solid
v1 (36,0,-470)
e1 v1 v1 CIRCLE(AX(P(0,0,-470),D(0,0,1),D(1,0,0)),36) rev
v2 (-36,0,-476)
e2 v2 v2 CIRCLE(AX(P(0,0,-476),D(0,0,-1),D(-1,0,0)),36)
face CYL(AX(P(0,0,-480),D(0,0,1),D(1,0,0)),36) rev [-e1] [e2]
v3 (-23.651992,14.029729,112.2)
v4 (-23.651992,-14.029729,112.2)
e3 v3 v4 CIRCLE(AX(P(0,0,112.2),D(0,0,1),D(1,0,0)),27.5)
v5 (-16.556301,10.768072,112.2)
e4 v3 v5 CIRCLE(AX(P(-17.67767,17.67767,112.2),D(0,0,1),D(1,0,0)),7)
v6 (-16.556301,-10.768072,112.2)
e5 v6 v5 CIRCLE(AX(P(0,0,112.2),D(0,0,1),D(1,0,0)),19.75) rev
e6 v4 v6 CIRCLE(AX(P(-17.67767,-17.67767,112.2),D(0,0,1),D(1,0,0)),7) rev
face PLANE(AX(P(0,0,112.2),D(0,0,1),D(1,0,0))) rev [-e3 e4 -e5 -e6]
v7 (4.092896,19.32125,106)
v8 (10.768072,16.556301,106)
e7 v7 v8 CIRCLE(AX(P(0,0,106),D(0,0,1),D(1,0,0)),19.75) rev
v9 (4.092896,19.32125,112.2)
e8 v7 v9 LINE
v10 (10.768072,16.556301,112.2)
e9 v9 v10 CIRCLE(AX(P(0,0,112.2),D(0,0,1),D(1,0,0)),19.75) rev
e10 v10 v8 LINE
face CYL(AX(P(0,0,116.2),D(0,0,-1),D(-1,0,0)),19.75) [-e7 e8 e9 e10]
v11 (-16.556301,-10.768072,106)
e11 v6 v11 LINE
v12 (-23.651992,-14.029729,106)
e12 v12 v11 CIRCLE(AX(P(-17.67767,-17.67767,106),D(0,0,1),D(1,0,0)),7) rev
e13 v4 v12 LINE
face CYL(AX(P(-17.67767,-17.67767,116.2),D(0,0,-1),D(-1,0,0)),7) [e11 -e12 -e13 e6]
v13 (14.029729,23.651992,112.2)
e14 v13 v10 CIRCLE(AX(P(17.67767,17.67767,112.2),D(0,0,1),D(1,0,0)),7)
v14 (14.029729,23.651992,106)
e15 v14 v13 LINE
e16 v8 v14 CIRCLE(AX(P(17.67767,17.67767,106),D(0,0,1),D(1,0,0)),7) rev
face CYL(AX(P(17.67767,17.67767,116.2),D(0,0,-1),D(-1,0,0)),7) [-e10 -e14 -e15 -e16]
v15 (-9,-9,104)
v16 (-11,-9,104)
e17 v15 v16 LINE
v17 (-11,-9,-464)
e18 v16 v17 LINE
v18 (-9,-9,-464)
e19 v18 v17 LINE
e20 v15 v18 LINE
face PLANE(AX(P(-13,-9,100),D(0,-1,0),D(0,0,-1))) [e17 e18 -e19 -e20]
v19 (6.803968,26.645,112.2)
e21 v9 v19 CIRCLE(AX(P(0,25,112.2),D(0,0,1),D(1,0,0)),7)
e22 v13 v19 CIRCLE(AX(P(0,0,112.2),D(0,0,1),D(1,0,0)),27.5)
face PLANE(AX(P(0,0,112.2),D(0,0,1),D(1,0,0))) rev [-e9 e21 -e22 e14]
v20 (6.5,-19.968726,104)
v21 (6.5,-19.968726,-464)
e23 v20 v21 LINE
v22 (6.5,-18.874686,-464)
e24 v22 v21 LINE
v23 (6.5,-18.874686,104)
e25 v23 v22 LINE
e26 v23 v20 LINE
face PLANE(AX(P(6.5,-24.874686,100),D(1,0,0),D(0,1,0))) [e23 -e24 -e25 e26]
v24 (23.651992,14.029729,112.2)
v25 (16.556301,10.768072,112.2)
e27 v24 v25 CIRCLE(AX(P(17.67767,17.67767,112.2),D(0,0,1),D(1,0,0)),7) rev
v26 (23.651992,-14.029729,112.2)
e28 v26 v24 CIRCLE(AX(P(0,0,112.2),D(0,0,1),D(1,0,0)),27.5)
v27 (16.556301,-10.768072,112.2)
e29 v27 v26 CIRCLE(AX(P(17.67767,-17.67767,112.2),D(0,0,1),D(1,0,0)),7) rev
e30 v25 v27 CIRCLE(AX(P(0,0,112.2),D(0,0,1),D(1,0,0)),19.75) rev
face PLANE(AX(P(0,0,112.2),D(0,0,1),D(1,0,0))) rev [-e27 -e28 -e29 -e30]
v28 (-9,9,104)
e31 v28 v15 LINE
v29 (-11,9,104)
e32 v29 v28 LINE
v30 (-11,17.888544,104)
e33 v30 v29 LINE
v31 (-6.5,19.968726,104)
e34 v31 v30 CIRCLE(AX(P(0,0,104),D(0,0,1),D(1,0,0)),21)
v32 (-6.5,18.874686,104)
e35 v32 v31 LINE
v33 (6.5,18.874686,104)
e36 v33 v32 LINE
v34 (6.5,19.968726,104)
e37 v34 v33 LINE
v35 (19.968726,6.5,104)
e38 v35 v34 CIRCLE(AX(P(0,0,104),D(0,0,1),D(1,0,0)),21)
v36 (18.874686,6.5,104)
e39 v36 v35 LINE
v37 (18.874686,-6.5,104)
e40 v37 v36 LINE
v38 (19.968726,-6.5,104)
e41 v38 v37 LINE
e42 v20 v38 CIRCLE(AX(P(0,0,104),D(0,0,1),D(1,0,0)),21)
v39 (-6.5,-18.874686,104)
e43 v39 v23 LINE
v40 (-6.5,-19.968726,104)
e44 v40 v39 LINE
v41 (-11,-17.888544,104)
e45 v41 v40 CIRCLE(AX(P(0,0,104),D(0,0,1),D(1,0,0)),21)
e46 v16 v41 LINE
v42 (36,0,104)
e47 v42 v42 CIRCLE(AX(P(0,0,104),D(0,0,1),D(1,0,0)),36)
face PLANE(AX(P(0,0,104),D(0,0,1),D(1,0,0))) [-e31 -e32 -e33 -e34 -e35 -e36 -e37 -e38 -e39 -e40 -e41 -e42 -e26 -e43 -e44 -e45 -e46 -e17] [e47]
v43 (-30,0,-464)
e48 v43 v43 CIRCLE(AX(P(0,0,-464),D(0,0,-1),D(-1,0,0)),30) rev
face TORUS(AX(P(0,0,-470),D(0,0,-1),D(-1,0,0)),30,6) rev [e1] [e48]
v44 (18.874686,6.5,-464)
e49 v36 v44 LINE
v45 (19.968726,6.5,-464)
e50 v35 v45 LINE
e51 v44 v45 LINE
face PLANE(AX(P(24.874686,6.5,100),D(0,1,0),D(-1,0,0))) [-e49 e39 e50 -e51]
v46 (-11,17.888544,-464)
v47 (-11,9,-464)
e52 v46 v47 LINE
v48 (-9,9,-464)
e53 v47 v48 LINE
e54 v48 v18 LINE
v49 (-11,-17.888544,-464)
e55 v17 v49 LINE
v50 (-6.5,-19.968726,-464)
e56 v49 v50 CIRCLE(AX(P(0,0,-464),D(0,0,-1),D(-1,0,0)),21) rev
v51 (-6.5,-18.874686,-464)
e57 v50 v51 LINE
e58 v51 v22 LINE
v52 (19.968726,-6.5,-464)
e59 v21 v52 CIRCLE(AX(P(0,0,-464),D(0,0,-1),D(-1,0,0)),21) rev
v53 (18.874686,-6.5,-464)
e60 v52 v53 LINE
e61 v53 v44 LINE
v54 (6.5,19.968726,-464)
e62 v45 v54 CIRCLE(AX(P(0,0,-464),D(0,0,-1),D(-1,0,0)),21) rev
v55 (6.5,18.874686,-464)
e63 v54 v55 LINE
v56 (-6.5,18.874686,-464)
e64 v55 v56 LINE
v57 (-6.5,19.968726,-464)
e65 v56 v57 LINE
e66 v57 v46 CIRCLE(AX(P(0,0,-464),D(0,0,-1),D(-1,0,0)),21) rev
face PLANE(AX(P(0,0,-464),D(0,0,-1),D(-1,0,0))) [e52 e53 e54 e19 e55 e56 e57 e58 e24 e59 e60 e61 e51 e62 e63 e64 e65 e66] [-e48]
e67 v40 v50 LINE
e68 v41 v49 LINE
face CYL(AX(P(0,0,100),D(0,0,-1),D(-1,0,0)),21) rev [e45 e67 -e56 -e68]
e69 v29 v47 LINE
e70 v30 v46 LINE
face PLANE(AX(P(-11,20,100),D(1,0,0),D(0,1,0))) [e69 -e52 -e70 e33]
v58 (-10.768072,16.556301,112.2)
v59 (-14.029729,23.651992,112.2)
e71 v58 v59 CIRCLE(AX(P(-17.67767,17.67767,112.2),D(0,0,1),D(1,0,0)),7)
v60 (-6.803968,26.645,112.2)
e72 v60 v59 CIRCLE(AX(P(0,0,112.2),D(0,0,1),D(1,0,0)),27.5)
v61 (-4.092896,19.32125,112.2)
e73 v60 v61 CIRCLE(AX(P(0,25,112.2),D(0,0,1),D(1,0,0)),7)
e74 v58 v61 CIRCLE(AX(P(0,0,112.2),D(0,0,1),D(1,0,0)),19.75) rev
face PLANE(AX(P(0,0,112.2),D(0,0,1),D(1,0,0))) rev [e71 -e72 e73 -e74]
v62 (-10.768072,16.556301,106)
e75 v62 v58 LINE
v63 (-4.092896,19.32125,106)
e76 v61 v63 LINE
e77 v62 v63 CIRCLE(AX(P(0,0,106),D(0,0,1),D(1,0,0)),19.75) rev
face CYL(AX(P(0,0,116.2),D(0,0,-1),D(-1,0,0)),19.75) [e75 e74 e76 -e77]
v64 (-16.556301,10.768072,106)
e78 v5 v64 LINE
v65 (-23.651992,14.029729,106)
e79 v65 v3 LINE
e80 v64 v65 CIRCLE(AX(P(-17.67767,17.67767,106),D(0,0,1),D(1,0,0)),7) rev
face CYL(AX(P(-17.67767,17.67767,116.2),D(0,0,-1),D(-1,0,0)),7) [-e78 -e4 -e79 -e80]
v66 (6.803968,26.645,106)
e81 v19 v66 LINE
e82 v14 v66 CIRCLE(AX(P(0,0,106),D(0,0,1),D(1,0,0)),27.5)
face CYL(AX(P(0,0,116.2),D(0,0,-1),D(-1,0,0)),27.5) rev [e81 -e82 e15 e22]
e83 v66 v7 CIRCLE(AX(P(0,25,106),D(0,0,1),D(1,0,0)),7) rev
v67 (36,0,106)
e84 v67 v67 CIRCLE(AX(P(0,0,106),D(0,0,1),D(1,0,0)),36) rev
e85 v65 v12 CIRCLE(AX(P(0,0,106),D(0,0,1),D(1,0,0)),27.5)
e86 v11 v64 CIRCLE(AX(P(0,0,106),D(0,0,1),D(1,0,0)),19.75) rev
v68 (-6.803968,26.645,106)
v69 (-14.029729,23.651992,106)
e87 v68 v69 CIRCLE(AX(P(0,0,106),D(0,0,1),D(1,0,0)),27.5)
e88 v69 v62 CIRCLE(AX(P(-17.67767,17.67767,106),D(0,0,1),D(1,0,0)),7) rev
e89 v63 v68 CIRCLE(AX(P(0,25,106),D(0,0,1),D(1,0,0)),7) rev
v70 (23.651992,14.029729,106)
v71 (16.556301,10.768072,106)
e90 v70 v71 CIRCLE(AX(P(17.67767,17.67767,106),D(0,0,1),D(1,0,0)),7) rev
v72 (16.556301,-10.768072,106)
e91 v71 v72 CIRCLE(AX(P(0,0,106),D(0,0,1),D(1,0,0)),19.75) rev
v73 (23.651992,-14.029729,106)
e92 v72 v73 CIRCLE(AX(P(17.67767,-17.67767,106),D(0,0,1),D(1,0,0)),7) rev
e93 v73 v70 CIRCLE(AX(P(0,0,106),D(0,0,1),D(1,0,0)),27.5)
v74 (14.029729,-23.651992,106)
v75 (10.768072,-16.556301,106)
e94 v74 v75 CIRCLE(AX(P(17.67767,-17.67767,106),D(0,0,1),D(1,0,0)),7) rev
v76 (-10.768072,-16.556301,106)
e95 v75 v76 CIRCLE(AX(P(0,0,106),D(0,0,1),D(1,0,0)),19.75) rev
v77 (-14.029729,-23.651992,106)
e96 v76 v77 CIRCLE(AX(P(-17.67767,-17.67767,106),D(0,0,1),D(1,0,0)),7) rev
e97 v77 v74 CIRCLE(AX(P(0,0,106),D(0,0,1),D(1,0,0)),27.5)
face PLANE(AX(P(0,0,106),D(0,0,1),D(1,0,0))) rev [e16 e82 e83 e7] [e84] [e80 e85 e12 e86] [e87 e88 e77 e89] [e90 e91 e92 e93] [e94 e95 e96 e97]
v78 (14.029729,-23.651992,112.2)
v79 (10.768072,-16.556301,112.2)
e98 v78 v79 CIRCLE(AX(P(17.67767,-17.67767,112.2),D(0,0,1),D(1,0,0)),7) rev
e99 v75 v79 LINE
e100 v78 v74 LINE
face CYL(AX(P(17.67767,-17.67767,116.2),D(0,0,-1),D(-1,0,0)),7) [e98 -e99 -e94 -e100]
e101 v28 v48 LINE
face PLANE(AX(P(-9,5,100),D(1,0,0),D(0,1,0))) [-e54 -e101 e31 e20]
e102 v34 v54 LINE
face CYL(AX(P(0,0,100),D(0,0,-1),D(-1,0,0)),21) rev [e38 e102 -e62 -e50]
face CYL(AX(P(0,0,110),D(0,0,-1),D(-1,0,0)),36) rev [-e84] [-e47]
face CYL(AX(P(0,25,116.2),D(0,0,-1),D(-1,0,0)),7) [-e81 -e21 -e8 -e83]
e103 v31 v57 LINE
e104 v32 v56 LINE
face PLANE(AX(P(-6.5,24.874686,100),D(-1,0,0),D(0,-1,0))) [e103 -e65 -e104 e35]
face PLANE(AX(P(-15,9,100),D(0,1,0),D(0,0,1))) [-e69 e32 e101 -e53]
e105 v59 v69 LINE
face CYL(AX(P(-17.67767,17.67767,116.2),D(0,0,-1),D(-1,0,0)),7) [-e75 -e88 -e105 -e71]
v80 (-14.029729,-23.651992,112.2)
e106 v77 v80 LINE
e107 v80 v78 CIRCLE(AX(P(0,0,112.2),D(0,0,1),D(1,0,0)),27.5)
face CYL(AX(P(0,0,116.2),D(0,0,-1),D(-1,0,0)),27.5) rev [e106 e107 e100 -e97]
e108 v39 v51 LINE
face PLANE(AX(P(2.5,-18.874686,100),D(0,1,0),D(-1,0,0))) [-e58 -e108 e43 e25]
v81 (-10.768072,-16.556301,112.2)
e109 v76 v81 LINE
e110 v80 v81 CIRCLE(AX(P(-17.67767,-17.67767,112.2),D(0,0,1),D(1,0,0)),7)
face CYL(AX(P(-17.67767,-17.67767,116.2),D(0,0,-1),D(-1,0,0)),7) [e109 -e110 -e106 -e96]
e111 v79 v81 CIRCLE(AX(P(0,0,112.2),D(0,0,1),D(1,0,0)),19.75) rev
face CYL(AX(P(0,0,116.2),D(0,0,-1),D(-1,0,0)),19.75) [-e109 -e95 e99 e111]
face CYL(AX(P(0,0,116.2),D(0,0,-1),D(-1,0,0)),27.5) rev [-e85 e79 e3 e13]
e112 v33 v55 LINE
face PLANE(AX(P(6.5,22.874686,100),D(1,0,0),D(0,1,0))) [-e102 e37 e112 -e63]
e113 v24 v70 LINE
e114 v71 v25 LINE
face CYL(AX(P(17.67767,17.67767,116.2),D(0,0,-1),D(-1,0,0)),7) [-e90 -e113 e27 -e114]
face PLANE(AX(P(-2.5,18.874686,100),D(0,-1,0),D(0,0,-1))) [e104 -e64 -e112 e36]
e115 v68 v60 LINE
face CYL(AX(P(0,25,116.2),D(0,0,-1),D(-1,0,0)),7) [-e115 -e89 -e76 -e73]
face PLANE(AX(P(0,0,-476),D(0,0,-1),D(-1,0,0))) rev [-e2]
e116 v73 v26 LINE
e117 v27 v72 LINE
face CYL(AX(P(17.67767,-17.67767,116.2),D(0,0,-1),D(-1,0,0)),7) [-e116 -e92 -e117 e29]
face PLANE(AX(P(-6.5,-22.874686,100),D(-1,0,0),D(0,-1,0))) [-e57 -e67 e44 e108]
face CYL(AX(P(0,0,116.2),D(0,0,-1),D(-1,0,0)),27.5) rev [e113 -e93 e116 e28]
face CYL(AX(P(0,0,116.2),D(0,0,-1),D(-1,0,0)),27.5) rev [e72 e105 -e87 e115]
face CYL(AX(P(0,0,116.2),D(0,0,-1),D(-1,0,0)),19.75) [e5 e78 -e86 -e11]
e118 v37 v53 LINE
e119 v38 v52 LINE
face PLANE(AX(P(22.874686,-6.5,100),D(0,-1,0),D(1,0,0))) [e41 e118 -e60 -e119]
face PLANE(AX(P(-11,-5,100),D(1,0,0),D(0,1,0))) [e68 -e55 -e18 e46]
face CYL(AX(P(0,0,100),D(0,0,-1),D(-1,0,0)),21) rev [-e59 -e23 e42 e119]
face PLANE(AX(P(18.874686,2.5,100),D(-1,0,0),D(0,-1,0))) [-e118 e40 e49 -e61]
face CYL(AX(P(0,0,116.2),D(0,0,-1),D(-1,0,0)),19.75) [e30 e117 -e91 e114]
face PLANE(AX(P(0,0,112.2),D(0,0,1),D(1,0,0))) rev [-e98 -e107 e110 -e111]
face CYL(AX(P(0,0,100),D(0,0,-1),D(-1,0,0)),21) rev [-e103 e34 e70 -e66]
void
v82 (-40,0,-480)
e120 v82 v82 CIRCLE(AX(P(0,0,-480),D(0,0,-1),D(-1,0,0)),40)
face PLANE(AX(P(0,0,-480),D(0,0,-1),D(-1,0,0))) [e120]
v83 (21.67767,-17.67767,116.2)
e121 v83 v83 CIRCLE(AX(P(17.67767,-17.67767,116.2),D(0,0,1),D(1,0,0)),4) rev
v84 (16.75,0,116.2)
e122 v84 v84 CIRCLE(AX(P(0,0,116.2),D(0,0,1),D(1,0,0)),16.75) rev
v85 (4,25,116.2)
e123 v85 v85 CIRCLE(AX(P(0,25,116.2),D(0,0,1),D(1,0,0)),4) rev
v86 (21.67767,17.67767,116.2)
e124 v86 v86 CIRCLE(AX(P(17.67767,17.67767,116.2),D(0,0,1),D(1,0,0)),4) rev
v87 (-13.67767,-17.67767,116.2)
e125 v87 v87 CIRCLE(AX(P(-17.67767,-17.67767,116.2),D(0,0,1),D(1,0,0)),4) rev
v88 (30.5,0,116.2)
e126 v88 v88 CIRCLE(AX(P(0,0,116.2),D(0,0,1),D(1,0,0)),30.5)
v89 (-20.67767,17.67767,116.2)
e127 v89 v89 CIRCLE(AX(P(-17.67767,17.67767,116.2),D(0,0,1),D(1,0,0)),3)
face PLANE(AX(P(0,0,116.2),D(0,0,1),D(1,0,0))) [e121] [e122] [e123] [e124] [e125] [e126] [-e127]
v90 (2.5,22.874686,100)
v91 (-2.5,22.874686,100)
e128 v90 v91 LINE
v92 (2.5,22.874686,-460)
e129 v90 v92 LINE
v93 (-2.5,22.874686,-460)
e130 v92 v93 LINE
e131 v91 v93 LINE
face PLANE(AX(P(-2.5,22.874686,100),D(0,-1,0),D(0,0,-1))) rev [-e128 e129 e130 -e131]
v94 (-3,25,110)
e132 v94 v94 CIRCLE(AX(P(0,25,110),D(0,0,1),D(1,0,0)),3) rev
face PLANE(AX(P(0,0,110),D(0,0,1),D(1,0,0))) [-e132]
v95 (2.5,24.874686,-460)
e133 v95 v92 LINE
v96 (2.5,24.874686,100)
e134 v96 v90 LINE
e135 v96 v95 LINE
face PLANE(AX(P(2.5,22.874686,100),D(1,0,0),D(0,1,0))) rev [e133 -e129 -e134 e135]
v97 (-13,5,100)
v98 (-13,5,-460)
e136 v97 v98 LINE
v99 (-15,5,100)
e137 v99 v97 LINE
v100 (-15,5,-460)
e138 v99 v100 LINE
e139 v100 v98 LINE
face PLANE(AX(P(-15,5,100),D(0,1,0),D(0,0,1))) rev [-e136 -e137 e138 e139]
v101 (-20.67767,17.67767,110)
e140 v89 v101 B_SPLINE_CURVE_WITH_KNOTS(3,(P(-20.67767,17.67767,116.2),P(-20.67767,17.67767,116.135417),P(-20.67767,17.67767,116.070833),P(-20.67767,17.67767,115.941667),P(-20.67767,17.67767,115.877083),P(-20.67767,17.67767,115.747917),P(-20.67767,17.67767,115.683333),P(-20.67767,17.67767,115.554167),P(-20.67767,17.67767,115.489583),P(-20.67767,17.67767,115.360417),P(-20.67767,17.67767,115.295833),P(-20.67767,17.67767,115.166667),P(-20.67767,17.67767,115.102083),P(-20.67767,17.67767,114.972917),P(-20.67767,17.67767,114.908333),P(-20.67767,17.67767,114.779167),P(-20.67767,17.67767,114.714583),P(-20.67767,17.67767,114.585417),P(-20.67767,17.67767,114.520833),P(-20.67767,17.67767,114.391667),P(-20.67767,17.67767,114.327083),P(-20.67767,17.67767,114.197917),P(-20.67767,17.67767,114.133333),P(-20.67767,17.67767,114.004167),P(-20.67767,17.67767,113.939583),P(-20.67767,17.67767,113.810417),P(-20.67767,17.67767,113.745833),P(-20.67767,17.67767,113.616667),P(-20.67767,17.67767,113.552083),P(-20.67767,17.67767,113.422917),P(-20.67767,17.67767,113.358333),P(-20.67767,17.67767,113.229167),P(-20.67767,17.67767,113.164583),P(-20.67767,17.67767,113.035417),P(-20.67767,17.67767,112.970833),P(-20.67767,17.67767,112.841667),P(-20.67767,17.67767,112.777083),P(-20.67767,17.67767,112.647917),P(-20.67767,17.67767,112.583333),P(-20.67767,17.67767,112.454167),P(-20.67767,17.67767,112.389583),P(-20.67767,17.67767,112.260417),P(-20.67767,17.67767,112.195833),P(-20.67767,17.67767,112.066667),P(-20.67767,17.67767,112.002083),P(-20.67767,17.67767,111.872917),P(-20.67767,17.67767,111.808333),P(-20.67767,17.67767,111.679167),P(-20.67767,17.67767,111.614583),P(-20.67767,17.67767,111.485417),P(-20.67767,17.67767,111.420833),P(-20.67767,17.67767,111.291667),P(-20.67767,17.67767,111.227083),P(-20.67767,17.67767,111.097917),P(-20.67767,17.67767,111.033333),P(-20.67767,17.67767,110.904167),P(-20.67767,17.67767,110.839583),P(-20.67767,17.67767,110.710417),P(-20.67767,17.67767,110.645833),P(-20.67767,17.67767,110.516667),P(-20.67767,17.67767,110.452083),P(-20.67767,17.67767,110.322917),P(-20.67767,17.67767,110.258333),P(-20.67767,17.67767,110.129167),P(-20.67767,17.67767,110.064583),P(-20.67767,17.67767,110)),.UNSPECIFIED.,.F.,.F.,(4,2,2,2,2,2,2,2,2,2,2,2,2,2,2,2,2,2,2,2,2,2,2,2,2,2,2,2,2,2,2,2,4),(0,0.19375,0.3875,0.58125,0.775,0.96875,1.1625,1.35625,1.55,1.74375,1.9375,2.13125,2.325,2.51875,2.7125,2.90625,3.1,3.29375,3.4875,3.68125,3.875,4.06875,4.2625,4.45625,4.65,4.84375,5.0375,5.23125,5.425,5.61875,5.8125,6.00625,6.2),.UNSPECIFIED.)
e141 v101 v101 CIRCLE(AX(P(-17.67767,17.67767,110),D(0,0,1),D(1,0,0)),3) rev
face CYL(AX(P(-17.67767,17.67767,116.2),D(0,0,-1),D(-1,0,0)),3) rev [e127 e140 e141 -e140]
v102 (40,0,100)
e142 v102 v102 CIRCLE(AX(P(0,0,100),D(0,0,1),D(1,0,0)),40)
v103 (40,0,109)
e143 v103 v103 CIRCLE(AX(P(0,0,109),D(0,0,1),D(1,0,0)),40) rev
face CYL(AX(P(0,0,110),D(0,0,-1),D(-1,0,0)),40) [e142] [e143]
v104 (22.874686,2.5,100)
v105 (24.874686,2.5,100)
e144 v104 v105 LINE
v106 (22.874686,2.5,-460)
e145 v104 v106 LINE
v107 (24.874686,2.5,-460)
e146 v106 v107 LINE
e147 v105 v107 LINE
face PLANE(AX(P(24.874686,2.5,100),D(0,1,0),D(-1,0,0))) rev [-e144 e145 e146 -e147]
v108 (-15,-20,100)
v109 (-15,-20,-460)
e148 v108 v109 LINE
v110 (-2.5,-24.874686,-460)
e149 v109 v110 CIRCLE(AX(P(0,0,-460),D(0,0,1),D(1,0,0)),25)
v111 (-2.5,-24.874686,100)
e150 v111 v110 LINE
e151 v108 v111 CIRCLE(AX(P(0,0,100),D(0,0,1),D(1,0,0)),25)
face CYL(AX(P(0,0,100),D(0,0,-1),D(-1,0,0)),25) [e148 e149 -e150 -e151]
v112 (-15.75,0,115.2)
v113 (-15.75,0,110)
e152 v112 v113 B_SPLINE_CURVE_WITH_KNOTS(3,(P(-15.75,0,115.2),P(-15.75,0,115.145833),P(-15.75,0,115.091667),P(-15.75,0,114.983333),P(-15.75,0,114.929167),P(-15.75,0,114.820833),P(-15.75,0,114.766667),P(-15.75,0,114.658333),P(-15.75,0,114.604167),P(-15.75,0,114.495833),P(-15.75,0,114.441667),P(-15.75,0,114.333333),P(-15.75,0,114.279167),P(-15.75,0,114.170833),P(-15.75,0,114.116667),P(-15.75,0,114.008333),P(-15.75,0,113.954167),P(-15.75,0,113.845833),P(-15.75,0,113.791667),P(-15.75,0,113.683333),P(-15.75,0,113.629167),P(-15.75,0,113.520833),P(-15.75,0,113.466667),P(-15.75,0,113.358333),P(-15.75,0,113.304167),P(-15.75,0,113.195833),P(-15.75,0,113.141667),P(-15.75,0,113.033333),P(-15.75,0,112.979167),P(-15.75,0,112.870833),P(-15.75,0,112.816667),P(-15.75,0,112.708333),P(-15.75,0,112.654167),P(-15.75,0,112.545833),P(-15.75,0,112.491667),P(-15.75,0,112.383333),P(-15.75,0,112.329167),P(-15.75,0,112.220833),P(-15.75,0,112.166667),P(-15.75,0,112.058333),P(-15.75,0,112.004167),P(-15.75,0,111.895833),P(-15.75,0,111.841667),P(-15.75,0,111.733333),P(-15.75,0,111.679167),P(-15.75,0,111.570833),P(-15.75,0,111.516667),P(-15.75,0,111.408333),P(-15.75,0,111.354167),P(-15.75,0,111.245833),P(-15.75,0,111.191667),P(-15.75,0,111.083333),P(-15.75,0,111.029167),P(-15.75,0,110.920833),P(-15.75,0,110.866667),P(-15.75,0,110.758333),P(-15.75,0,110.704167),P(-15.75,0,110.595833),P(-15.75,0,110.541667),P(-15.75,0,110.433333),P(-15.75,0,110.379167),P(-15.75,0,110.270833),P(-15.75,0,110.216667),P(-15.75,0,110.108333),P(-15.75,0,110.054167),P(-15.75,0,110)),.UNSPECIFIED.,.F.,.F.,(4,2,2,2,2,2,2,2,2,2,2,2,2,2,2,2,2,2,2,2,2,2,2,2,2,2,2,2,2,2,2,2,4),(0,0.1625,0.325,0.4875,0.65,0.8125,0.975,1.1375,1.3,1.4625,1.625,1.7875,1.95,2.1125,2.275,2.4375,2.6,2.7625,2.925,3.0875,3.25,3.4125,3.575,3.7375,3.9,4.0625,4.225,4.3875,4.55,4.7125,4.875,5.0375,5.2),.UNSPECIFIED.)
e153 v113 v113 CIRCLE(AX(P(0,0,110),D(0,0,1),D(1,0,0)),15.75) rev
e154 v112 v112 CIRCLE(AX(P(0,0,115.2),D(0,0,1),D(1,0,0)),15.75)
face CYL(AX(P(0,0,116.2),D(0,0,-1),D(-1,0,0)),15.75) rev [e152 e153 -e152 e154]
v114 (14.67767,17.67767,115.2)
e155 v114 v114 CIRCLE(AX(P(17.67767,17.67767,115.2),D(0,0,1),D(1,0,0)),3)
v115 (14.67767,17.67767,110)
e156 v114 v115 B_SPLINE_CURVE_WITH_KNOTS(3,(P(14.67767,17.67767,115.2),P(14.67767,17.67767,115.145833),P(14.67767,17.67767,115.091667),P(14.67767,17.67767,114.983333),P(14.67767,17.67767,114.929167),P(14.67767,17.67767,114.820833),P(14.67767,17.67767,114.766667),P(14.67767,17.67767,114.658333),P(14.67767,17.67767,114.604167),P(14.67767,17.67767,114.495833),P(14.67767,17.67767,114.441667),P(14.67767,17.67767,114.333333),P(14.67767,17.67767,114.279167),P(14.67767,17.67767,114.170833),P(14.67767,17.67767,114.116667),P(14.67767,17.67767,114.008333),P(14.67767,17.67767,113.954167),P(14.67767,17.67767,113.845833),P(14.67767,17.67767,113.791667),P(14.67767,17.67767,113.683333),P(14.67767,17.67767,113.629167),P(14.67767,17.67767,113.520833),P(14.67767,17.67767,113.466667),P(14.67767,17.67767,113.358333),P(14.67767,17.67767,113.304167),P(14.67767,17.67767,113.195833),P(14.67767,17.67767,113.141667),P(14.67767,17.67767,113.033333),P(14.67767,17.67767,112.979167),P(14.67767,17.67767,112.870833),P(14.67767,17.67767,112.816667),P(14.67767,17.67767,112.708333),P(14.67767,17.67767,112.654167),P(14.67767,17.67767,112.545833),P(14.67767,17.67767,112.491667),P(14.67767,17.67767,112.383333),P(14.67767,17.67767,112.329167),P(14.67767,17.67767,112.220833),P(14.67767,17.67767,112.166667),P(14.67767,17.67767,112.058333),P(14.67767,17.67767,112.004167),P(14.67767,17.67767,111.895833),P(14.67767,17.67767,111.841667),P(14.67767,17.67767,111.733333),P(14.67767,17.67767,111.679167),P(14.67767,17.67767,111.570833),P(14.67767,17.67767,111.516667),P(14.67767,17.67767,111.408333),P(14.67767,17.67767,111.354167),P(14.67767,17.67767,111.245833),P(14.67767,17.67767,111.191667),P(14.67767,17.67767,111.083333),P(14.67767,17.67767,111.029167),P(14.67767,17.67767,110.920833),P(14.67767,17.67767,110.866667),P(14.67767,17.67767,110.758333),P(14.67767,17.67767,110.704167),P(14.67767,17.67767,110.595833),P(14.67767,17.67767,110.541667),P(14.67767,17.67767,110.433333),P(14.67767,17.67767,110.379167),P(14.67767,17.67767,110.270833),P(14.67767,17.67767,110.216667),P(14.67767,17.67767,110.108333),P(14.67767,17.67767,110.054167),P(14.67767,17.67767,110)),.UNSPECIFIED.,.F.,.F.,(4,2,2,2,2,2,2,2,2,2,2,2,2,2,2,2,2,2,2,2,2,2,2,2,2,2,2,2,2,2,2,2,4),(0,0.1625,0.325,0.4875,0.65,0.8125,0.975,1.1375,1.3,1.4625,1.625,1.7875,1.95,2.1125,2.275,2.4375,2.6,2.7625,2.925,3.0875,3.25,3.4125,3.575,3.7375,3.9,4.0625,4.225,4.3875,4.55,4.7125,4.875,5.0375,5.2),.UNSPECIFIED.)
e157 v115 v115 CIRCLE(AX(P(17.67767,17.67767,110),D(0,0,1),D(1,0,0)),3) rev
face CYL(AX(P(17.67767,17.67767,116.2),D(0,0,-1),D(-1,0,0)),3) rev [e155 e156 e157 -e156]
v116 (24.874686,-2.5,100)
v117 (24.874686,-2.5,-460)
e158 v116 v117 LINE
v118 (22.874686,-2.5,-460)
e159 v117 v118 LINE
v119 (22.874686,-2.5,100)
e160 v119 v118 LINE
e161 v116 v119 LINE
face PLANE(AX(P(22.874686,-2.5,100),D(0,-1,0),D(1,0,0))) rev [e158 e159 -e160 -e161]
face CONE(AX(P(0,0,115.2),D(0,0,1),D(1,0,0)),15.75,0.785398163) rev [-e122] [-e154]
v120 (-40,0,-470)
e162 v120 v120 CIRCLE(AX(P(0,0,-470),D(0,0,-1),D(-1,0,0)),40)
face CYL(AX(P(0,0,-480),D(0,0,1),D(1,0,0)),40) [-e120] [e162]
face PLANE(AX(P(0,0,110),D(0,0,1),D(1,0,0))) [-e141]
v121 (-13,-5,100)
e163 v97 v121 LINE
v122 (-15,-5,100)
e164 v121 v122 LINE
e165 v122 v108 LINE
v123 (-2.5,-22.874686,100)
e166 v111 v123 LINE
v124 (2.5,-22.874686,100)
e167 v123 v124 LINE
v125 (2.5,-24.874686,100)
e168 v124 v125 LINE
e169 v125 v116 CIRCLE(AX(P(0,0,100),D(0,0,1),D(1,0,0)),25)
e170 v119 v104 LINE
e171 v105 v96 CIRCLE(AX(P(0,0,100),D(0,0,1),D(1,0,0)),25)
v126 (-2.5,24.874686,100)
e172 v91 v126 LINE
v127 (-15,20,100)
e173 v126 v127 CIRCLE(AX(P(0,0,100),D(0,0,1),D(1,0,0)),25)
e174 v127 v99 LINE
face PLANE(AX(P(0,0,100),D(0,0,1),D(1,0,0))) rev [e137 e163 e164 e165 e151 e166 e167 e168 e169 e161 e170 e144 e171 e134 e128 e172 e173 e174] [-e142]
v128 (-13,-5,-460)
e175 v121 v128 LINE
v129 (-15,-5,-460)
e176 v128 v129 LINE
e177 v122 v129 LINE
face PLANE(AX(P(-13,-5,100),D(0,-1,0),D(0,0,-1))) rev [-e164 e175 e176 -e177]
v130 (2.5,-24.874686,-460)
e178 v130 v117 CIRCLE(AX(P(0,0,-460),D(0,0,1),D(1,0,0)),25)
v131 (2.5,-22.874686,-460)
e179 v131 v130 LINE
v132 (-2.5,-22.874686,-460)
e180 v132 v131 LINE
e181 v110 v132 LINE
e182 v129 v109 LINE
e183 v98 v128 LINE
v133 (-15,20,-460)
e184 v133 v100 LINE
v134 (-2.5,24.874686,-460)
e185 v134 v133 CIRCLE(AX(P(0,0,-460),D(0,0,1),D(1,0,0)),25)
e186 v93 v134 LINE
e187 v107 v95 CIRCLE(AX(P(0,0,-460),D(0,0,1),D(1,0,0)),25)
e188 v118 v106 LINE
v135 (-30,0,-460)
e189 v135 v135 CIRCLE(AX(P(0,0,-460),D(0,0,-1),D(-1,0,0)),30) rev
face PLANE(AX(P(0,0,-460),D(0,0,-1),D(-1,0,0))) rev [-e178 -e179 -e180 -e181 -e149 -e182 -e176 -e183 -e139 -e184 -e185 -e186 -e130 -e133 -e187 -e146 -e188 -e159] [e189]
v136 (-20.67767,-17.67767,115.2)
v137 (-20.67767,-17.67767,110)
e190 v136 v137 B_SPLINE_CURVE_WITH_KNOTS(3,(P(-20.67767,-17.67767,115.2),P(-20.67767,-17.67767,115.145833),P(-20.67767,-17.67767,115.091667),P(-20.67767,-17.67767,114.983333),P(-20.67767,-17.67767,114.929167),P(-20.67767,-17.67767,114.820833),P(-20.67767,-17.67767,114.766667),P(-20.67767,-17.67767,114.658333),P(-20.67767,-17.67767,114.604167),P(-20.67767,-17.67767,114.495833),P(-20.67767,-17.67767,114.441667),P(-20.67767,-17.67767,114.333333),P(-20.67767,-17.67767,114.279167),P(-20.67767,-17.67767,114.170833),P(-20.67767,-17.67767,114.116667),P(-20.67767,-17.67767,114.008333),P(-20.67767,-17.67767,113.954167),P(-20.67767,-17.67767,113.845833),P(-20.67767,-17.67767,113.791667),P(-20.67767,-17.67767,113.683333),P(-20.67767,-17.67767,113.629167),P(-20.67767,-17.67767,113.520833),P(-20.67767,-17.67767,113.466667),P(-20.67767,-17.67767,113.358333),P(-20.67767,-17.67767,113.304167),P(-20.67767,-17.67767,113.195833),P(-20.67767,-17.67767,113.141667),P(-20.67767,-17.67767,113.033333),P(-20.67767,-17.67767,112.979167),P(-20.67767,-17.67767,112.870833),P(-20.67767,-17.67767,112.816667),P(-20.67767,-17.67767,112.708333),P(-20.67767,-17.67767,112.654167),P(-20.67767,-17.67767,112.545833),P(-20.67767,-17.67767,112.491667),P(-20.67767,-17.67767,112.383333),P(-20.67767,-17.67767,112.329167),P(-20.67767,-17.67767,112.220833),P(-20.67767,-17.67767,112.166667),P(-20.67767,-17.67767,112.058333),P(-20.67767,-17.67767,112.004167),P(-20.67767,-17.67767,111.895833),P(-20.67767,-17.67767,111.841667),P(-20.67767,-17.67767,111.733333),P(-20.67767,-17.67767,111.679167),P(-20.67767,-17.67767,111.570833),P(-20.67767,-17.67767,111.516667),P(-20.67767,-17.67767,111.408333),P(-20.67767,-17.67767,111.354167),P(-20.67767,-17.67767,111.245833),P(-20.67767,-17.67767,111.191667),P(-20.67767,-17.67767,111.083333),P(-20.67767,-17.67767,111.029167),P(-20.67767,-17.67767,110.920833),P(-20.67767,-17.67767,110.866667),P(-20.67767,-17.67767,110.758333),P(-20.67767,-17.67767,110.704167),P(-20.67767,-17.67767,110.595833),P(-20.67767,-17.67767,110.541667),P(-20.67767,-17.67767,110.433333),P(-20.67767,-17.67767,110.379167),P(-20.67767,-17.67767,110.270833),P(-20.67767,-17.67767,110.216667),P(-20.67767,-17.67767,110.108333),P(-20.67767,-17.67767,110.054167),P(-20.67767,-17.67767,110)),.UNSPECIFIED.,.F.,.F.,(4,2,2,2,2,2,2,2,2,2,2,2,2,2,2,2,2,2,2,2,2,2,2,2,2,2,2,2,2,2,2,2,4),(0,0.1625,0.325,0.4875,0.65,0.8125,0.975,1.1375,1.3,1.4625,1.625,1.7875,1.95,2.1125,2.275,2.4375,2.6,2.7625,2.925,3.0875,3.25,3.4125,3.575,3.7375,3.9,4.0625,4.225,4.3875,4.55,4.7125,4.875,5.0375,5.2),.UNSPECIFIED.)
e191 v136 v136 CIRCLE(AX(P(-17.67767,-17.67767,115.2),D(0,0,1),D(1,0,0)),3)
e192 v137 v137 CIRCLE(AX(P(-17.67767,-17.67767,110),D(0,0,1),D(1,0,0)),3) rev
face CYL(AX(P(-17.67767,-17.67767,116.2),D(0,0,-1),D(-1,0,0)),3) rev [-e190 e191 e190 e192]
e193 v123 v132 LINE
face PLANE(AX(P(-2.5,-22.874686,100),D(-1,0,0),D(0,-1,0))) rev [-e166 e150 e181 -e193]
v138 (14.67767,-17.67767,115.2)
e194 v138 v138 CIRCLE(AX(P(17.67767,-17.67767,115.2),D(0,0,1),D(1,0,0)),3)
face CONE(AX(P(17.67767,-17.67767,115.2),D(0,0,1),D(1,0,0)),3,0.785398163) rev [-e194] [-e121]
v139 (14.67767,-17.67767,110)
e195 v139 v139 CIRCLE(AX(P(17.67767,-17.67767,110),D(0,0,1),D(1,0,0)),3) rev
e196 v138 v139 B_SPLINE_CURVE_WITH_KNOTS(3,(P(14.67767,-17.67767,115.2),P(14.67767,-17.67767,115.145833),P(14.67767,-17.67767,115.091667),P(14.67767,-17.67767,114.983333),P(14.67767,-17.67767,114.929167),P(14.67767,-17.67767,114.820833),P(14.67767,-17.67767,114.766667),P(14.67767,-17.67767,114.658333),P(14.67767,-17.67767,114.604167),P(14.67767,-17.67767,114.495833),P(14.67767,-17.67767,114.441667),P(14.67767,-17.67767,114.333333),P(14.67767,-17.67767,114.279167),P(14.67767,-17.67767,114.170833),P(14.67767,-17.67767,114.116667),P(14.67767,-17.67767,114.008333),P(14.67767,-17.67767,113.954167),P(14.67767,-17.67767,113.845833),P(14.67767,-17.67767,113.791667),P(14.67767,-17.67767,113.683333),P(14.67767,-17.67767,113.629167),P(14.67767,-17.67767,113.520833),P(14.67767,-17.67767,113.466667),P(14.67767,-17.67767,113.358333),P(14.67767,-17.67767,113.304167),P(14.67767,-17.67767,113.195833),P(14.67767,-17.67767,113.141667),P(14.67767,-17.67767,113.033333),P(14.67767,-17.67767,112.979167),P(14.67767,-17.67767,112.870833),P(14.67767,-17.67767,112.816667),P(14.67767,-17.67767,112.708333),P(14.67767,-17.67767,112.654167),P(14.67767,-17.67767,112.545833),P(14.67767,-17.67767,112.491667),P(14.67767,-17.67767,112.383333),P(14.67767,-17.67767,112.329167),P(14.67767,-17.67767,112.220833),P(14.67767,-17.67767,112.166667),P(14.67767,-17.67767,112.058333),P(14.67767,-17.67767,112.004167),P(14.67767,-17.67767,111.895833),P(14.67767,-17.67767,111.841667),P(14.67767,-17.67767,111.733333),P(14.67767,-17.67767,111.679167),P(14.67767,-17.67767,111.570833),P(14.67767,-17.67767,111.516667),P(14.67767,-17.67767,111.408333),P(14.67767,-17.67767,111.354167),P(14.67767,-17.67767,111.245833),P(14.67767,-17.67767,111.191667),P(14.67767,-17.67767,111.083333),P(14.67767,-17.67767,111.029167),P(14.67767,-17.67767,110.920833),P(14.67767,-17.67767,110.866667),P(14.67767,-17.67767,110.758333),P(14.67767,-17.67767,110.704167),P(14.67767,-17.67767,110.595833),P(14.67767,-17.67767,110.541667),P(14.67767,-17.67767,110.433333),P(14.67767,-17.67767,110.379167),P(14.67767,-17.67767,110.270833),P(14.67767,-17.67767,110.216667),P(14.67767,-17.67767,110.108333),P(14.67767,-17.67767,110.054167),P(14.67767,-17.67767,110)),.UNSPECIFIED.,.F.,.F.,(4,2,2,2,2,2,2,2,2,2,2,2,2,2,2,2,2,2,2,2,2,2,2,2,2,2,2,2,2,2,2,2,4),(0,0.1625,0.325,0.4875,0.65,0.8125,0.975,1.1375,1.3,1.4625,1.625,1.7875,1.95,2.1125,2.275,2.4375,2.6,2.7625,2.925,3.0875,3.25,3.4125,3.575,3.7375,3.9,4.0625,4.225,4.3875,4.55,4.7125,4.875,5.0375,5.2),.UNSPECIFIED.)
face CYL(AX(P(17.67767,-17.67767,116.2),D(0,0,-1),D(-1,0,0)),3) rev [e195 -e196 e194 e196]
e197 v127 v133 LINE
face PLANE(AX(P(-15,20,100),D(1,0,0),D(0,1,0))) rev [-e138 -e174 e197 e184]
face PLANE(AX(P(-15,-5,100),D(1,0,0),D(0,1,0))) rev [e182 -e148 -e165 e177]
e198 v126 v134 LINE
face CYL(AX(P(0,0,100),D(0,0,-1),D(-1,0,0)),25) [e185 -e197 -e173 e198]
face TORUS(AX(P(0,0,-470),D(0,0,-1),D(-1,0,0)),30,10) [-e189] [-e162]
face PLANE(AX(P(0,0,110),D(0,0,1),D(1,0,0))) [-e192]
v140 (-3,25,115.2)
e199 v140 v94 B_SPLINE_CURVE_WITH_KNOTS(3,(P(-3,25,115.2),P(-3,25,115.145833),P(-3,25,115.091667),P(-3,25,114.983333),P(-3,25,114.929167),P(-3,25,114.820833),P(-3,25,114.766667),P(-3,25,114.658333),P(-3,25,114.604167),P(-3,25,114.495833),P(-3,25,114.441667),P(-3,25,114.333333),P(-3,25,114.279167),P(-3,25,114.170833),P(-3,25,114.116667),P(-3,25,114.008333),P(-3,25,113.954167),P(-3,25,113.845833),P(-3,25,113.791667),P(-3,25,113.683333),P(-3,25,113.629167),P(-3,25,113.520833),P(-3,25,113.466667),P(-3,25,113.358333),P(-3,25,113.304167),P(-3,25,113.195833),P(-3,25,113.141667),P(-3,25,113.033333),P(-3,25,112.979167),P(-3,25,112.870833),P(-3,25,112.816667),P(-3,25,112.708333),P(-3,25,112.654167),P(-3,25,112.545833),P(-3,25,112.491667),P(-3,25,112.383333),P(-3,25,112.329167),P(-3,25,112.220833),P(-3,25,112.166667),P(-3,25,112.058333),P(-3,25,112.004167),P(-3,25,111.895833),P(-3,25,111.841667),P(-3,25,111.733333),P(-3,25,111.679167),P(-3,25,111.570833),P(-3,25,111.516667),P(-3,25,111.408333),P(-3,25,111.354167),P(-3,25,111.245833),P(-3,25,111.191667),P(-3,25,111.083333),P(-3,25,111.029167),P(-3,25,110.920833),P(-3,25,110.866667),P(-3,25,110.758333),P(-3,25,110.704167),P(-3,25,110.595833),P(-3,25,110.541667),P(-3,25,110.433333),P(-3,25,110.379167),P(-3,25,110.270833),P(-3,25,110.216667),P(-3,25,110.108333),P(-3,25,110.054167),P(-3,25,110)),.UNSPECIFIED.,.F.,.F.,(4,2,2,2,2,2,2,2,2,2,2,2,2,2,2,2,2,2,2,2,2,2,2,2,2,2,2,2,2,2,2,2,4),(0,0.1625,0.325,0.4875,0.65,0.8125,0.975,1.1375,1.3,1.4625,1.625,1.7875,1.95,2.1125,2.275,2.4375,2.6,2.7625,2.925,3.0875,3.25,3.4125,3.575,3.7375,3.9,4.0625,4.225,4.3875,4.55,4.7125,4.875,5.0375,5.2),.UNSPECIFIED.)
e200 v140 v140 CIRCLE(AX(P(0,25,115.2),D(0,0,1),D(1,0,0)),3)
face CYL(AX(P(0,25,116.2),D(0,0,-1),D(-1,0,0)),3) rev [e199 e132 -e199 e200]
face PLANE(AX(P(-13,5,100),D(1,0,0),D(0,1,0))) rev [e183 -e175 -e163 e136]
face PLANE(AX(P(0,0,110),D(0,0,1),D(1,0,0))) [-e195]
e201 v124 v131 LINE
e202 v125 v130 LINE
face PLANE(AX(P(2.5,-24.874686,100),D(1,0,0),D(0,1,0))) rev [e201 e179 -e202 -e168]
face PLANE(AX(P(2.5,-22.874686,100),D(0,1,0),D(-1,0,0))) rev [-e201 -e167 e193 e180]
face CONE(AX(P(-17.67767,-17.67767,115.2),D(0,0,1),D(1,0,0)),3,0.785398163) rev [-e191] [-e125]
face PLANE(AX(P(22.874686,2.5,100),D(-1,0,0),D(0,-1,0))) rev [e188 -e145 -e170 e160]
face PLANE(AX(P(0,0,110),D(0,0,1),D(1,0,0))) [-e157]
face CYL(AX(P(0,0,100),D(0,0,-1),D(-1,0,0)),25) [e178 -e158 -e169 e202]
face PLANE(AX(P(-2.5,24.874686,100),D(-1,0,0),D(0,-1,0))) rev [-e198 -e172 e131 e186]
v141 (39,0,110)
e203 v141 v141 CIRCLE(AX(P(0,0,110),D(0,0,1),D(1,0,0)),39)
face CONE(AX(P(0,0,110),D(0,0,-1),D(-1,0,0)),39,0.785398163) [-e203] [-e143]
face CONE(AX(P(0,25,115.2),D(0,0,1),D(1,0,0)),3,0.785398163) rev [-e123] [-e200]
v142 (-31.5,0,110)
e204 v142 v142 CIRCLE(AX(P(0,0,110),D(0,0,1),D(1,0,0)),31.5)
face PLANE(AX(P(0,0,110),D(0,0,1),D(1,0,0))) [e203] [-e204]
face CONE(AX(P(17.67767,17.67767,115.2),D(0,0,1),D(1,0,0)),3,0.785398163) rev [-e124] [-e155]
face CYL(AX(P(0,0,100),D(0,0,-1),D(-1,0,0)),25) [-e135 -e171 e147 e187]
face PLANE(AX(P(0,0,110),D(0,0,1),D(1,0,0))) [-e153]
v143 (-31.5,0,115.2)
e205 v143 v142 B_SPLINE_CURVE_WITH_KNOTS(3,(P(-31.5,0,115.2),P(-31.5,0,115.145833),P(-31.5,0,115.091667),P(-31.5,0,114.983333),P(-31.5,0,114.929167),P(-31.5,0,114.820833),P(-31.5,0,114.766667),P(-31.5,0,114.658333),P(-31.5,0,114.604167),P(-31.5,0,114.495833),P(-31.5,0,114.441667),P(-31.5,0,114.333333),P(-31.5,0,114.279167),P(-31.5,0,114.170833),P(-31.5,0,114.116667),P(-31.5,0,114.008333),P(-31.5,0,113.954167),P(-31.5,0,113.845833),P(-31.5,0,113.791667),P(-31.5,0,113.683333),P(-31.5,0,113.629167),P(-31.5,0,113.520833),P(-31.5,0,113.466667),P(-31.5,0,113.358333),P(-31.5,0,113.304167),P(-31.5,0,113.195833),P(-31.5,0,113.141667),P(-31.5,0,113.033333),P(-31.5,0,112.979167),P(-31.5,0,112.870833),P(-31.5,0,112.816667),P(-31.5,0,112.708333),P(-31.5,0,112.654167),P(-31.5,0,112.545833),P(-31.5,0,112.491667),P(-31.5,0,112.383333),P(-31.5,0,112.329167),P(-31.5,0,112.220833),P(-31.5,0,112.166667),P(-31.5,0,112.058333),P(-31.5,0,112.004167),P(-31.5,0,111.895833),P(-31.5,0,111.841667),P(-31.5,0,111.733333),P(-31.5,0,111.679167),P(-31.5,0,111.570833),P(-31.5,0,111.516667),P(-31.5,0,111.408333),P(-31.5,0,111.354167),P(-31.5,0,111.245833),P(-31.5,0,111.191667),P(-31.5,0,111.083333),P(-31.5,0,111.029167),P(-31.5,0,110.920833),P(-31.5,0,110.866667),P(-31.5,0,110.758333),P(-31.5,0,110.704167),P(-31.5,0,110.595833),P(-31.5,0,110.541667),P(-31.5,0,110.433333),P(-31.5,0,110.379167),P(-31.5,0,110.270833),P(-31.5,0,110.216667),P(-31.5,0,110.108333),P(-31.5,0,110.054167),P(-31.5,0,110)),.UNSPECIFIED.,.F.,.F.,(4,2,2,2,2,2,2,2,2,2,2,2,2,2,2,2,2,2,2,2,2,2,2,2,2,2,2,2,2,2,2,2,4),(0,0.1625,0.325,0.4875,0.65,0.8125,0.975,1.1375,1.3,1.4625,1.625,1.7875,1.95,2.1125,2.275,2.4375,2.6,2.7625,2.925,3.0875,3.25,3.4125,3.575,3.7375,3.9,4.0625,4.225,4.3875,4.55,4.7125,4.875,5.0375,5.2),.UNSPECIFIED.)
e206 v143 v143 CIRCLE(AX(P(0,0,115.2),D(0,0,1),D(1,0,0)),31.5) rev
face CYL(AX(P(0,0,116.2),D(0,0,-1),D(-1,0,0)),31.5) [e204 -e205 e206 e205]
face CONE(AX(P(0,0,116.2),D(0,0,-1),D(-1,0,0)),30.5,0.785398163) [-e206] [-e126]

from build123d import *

# Parameters (mm, degrees)
AUFSATZ_LINEAR_AUSTRAGEN1_DEPTH = 100
AUFSATZ_LINEAR_START            = -460
AUFSATZ_LINEAR_AUSTRAGEN2_DEPTH = 460
SKIZZE2_R                       = 40
AUFSATZ_LINEAR_AUSTRAGEN3_DEPTH = 10
AUFSATZ_LINEAR_START_2          = 20
SKIZZE3_R                       = 40
AUFSATZ_LINEAR_AUSTRAGEN4_DEPTH = 20
SKIZZE4_R                       = 31.5
SKIZZE4_R_2                     = 15.75
SKIZZE4_R_3                     = 3
AUFSATZ_LINEAR_AUSTRAGEN5_DEPTH = 6.2
FASE1_SIZE                      = 1
VERRUNDUNG1_R                   = 10
WANDUNG8_START                  = -476
WANDUNG8_DEPTH                  = 582
WANDUNG8_2_OUTLINE_R            = 36
WANDUNG8_2_DEPTH                = 5.9999999
WANDUNG8_START_2                = 104
WANDUNG8_3_OUTLINE_R            = 36
WANDUNG8_3_DEPTH                = 2
WANDUNG8_START_3                = 106
WANDUNG8_4_DEPTH                = 6.2
WANDUNG8_5_DEPTH                = 12


with BuildPart() as part:
    # Skizze1 → Aufsatz-Linear austragen1 (new body)
    with BuildSketch(Plane.XY):
        with BuildLine():
            Line((-15, 20), (-15, 5))
            Line((-15, 5), (-13, 5))
            Line((-13, 5), (-13, -5))
            Line((-13, -5), (-15, -5))
            Line((-15, -5), (-15, -20))
            ThreePointArc((-15, -20), (-9.083123952, -23.291561976), (-2.5, -24.874685928))
            Line((-2.5, -24.874685928), (-2.5, -22.874685928))
            Line((-2.5, -22.874685928), (2.5, -22.874685928))
            Line((2.5, -22.874685928), (2.5, -24.874685928))
            ThreePointArc((2.5, -24.874685928), (17.67766953, -17.67766953), (24.874685928, -2.5))
            Line((24.874685928, -2.5), (22.874685928, -2.5))
            Line((22.874685928, -2.5), (22.874685928, 2.5))
            Line((22.874685928, 2.5), (24.874685928, 2.5))
            ThreePointArc((24.874685928, 2.5), (17.67766953, 17.67766953), (2.5, 24.874685928))
            Line((2.5, 24.874685928), (2.5, 22.874685928))
            Line((2.5, 22.874685928), (-2.5, 22.874685928))
            Line((-2.5, 22.874685928), (-2.5, 24.874685928))
            ThreePointArc((-2.5, 24.874685928), (-9.083123952, 23.291561976), (-15, 20))
        make_face()
    extrude(amount=AUFSATZ_LINEAR_AUSTRAGEN1_DEPTH)

    # Skizze1<2> → Aufsatz-Linear austragen2 (add)
    with BuildSketch(Plane.XY.offset(AUFSATZ_LINEAR_START)):
        with BuildLine():
            Line((-15, 20), (-15, 5))
            Line((-15, 5), (-13, 5))
            Line((-13, 5), (-13, -5))
            Line((-13, -5), (-15, -5))
            Line((-15, -5), (-15, -20))
            ThreePointArc((-15, -20), (-9.083123952, -23.291561976), (-2.5, -24.874685928))
            Line((-2.5, -24.874685928), (-2.5, -22.874685928))
            Line((-2.5, -22.874685928), (2.5, -22.874685928))
            Line((2.5, -22.874685928), (2.5, -24.874685928))
            ThreePointArc((2.5, -24.874685928), (17.67766953, -17.67766953), (24.874685928, -2.5))
            Line((24.874685928, -2.5), (22.874685928, -2.5))
            Line((22.874685928, -2.5), (22.874685928, 2.5))
            Line((22.874685928, 2.5), (24.874685928, 2.5))
            ThreePointArc((24.874685928, 2.5), (17.67766953, 17.67766953), (2.5, 24.874685928))
            Line((2.5, 24.874685928), (2.5, 22.874685928))
            Line((2.5, 22.874685928), (-2.5, 22.874685928))
            Line((-2.5, 22.874685928), (-2.5, 24.874685928))
            ThreePointArc((-2.5, 24.874685928), (-9.083123952, 23.291561976), (-15, 20))
        make_face()
    extrude(amount=AUFSATZ_LINEAR_AUSTRAGEN2_DEPTH)

    # Skizze2 → Aufsatz-Linear austragen3 (add)
    with BuildSketch(Plane.XY.offset(100)):
        Circle(SKIZZE2_R)
    extrude(amount=AUFSATZ_LINEAR_AUSTRAGEN3_DEPTH)

    # Skizze3 → Aufsatz-Linear austragen4 (add)
    with BuildSketch(Plane(origin=(0, 0, -460), x_dir=(-1, 0, 0), z_dir=(0, 0, -1)).offset(AUFSATZ_LINEAR_START_2)):
        with Locations(Location((0, 0, 0), (0, 0, 180))):
            Circle(SKIZZE3_R)
    extrude(amount=-AUFSATZ_LINEAR_AUSTRAGEN4_DEPTH)

    # Skizze4 → Aufsatz-Linear austragen5 (add)
    with BuildSketch(Plane.XY.offset(110)):
        with Locations(Location((0, 0, 0), (0, 0, 180))):
            Circle(SKIZZE4_R)
        with Locations(Location((0, 0, 0), (0, 0, 180))):
            Circle(SKIZZE4_R_2, mode=Mode.SUBTRACT)
        with Locations(Location((0, 25, 0), (0, 0, 180))):
            Circle(SKIZZE4_R_3, mode=Mode.SUBTRACT)
        with Locations(Location((17.67766953, 17.67766953, 0), (0, 0, 180))):
            Circle(SKIZZE4_R_3, mode=Mode.SUBTRACT)
        with Locations(Location((17.67766953, -17.67766953, 0), (0, 0, 180))):
            Circle(SKIZZE4_R_3, mode=Mode.SUBTRACT)
        with Locations(Location((-17.67766953, -17.67766953, 0), (0, 0, 180))):
            Circle(SKIZZE4_R_3, mode=Mode.SUBTRACT)
        with Locations(Location((-17.67766953, 17.67766953, 0), (0, 0, 180))):
            Circle(SKIZZE4_R_3, mode=Mode.SUBTRACT)
    extrude(amount=AUFSATZ_LINEAR_AUSTRAGEN5_DEPTH)

    # Fase1
    fase1_edges = [part.edges().sort_by_distance(p)[0] for p in [
        (-40, 0, 110),
        (31.5, 0, 116.2),
        (15.75, 0, 116.2),
        (3, 25, 116.2),
        (20.67766953, 17.67766953, 116.2),
        (20.67766953, -17.67766953, 116.2),
        (-14.67766953, -17.67766953, 116.2),
    ]]
    chamfer(fase1_edges, length=FASE1_SIZE)

    # Verrundung1
    verrundung1_edges = [part.edges().sort_by_distance(p)[0] for p in [
        (-40, 0, -460),
    ]]
    fillet(verrundung1_edges, radius=VERRUNDUNG1_R)

    # Wandung8: read off the stored shape, not the designer's step
    # Wandung8 outline → Wandung8 (cut)
    with BuildSketch(Plane.XY.offset(WANDUNG8_START)):
        with BuildLine():
            ThreePointArc((-6.5, 19.968725548), (-8.811599685, 19.06189159), (-11, 17.88854382))
            Line((-11, 17.88854382), (-11, 9))
            Line((-11, 9), (-9, 9))
            Line((-9, 9), (-9, -9))
            Line((-9, -9), (-11, -9))
            Line((-11, -9), (-11, -17.88854382))
            ThreePointArc((-11, -17.88854382), (-8.811599685, -19.06189159), (-6.5, -19.968725548))
            Line((-6.5, -19.968725548), (-6.5, -18.874685928))
            Line((-6.5, -18.874685928), (6.5, -18.874685928))
            Line((6.5, -18.874685928), (6.5, -19.968725548))
            ThreePointArc((6.5, -19.968725548), (14.849242405, -14.849242405), (19.968725548, -6.5))
            Line((19.968725548, -6.5), (18.874685928, -6.5))
            Line((18.874685928, -6.5), (18.874685928, 6.5))
            Line((18.874685928, 6.5), (19.968725548, 6.5))
            ThreePointArc((19.968725548, 6.5), (14.849242405, 14.849242405), (6.5, 19.968725548))
            Line((6.5, 19.968725548), (6.5, 18.874685928))
            Line((6.5, 18.874685928), (-6.5, 18.874685928))
            Line((-6.5, 18.874685928), (-6.5, 19.968725548))
        make_face()
    extrude(amount=WANDUNG8_DEPTH, mode=Mode.SUBTRACT)

    # Wandung8 2 outline → Wandung8 2 (cut)
    with BuildSketch(Plane.XY.offset(WANDUNG8_START)):
        Circle(WANDUNG8_2_OUTLINE_R)
        with BuildLine():
            ThreePointArc((-11, 17.88854382), (-8.811599685, 19.06189159), (-6.5, 19.968725548))
            Line((-6.5, 19.968725548), (-6.5, 18.874685928))
            Line((-6.5, 18.874685928), (6.5, 18.874685928))
            Line((6.5, 18.874685928), (6.5, 19.968725548))
            ThreePointArc((6.5, 19.968725548), (14.849242405, 14.849242405), (19.968725548, 6.5))
            Line((19.968725548, 6.5), (18.874685928, 6.5))
            Line((18.874685928, 6.5), (18.874685928, -6.5))
            Line((18.874685928, -6.5), (19.968725548, -6.5))
            ThreePointArc((19.968725548, -6.5), (14.849242405, -14.849242405), (6.5, -19.968725548))
            Line((6.5, -19.968725548), (6.5, -18.874685928))
            Line((6.5, -18.874685928), (-6.5, -18.874685928))
            Line((-6.5, -18.874685928), (-6.5, -19.968725548))
            ThreePointArc((-6.5, -19.968725548), (-8.811599685, -19.06189159), (-11, -17.88854382))
            Line((-11, -17.88854382), (-11, -9))
            Line((-11, -9), (-9, -9))
            Line((-9, -9), (-9, 9))
            Line((-9, 9), (-11, 9))
            Line((-11, 9), (-11, 17.88854382))
        make_face(mode=Mode.SUBTRACT)
    extrude(amount=WANDUNG8_2_DEPTH, mode=Mode.SUBTRACT)

    # Wandung8 3 outline → Wandung8 3 (cut)
    with BuildSketch(Plane.XY.offset(WANDUNG8_START_2)):
        Circle(WANDUNG8_3_OUTLINE_R)
        with BuildLine():
            ThreePointArc((-11, 17.88854382), (-8.811599685, 19.06189159), (-6.5, 19.968725548))
            Line((-6.5, 19.968725548), (-6.5, 18.874685928))
            Line((-6.5, 18.874685928), (6.5, 18.874685928))
            Line((6.5, 18.874685928), (6.5, 19.968725548))
            ThreePointArc((6.5, 19.968725548), (14.849242405, 14.849242405), (19.968725548, 6.5))
            Line((19.968725548, 6.5), (18.874685928, 6.5))
            Line((18.874685928, 6.5), (18.874685928, -6.5))
            Line((18.874685928, -6.5), (19.968725548, -6.5))
            ThreePointArc((19.968725548, -6.5), (14.849242405, -14.849242405), (6.5, -19.968725548))
            Line((6.5, -19.968725548), (6.5, -18.874685928))
            Line((6.5, -18.874685928), (-6.5, -18.874685928))
            Line((-6.5, -18.874685928), (-6.5, -19.968725548))
            ThreePointArc((-6.5, -19.968725548), (-8.811599685, -19.06189159), (-11, -17.88854382))
            Line((-11, -17.88854382), (-11, -9))
            Line((-11, -9), (-9, -9))
            Line((-9, -9), (-9, 9))
            Line((-9, 9), (-11, 9))
            Line((-11, 9), (-11, 17.88854382))
        make_face(mode=Mode.SUBTRACT)
    extrude(amount=WANDUNG8_3_DEPTH, mode=Mode.SUBTRACT)

    # Wandung8 4 outline → Wandung8 4 (cut)
    with BuildSketch(Plane.XY.offset(WANDUNG8_START_3)):
        with BuildLine():
            ThreePointArc((-23.651991808, -14.029728561), (-20.601261764, -11.317433021), (-16.556301479, -10.768072313))
            ThreePointArc((-16.556301479, -10.768072313), (-19.75, 0), (-16.556301479, 10.768072313))
            ThreePointArc((-16.556301479, 10.768072313), (-20.601261764, 11.317433021), (-23.651991808, 14.029728561))
            ThreePointArc((-23.651991808, 14.029728561), (-27.5, 0), (-23.651991808, -14.029728561))
        make_face()
        with BuildLine():
            ThreePointArc((-10.768072313, 16.556301479), (-7.557997789, 18.246620767), (-4.092896094, 19.32125))
            ThreePointArc((-4.092896094, 19.32125), (-6.56465826, 22.569925529), (-6.803967593, 26.645))
            ThreePointArc((-6.803967593, 26.645), (-10.52379439, 25.406687144), (-14.029728561, 23.651991808))
            ThreePointArc((-14.029728561, 23.651991808), (-11.317433021, 20.601261764), (-10.768072313, 16.556301479))
        make_face()
        with BuildLine():
            ThreePointArc((10.768072313, 16.556301479), (11.317433021, 20.601261764), (14.029728561, 23.651991808))
            ThreePointArc((14.029728561, 23.651991808), (10.52379439, 25.406687144), (6.803967593, 26.645))
            ThreePointArc((6.803967593, 26.645), (6.56465826, 22.569925529), (4.092896094, 19.32125))
            ThreePointArc((4.092896094, 19.32125), (7.557997789, 18.246620767), (10.768072313, 16.556301479))
        make_face()
        with BuildLine():
            ThreePointArc((16.556301479, 10.768072313), (19.75, 0), (16.556301479, -10.768072313))
            ThreePointArc((16.556301479, -10.768072313), (20.601261764, -11.317433021), (23.651991808, -14.029728561))
            ThreePointArc((23.651991808, -14.029728561), (27.5, 0), (23.651991808, 14.029728561))
            ThreePointArc((23.651991808, 14.029728561), (20.601261764, 11.317433021), (16.556301479, 10.768072313))
        make_face()
        with BuildLine():
            ThreePointArc((-10.768072313, -16.556301479), (-11.317433021, -20.601261764), (-14.029728561, -23.651991808))
            ThreePointArc((-14.029728561, -23.651991808), (0, -27.5), (14.029728561, -23.651991808))
            ThreePointArc((14.029728561, -23.651991808), (11.317433021, -20.601261764), (10.768072313, -16.556301479))
            ThreePointArc((10.768072313, -16.556301479), (0, -19.75), (-10.768072313, -16.556301479))
        make_face()
    extrude(amount=WANDUNG8_4_DEPTH, mode=Mode.SUBTRACT)

    # Wandung8 5 outline → Wandung8 5 (cut)
    with BuildSketch(Plane.XY.offset(WANDUNG8_START)):
        with BuildLine():
            ThreePointArc((-23.651991808, -14.029728561), (-20.601261764, -11.317433021), (-16.556301479, -10.768072313))
            ThreePointArc((-16.556301479, -10.768072313), (-19.75, 0), (-16.556301479, 10.768072313))
            ThreePointArc((-16.556301479, 10.768072313), (-20.601261764, 11.317433021), (-23.651991808, 14.029728561))
            ThreePointArc((-23.651991808, 14.029728561), (-27.5, 0), (-23.651991808, -14.029728561))
        make_face()
        with BuildLine():
            Line((-6.5, 18.874685928), (-5.814527592, 18.874685928))
            ThreePointArc((-5.814527592, 18.874685928), (-4.958741361, 19.117358188), (-4.092896094, 19.32125))
            ThreePointArc((-4.092896094, 19.32125), (-6.56465826, 22.569925529), (-6.803967593, 26.645))
            ThreePointArc((-6.803967593, 26.645), (-10.52379439, 25.406687144), (-14.029728561, 23.651991808))
            ThreePointArc((-14.029728561, 23.651991808), (-11.672924804, 21.275313311), (-10.689017037, 18.076086822))
            ThreePointArc((-10.689017037, 18.076086822), (-8.646449966, 19.137369281), (-6.5, 19.968725548))
            Line((-6.5, 19.968725548), (-6.5, 18.874685928))
        make_face()
        with BuildLine():
            ThreePointArc((4.092896094, 19.32125), (4.958741361, 19.117358188), (5.814527592, 18.874685928))
            Line((5.814527592, 18.874685928), (6.5, 18.874685928))
            Line((6.5, 18.874685928), (6.5, 19.968725548))
            ThreePointArc((6.5, 19.968725548), (8.646449966, 19.137369281), (10.689017037, 18.076086822))
            ThreePointArc((10.689017037, 18.076086822), (11.672924804, 21.275313311), (14.029728561, 23.651991808))
            ThreePointArc((14.029728561, 23.651991808), (10.52379439, 25.406687144), (6.803967593, 26.645))
            ThreePointArc((6.803967593, 26.645), (6.56465826, 22.569925529), (4.092896094, 19.32125))
        make_face()
        with BuildLine():
            ThreePointArc((23.651991808, 14.029728561), (21.275313311, 11.672924804), (18.076086822, 10.689017037))
            ThreePointArc((18.076086822, 10.689017037), (19.137369281, 8.646449966), (19.968725548, 6.5))
            Line((19.968725548, 6.5), (18.874685928, 6.5))
            Line((18.874685928, 6.5), (18.874685928, -6.5))
            Line((18.874685928, -6.5), (19.968725548, -6.5))
            ThreePointArc((19.968725548, -6.5), (19.137369281, -8.646449966), (18.076086822, -10.689017037))
            ThreePointArc((18.076086822, -10.689017037), (21.275313311, -11.672924804), (23.651991808, -14.029728561))
            ThreePointArc((23.651991808, -14.029728561), (27.5, 0), (23.651991808, 14.029728561))
        make_face()
        with BuildLine():
            ThreePointArc((-6.5, -19.968725548), (-8.646449966, -19.137369281), (-10.689017037, -18.076086822))
            ThreePointArc((-10.689017037, -18.076086822), (-11.672924804, -21.275313311), (-14.029728561, -23.651991808))
            ThreePointArc((-14.029728561, -23.651991808), (0, -27.5), (14.029728561, -23.651991808))
            ThreePointArc((14.029728561, -23.651991808), (11.672924804, -21.275313311), (10.689017037, -18.076086822))
            ThreePointArc((10.689017037, -18.076086822), (8.646449966, -19.137369281), (6.5, -19.968725548))
            Line((6.5, -19.968725548), (6.5, -18.874685928))
            Line((6.5, -18.874685928), (-6.5, -18.874685928))
            Line((-6.5, -18.874685928), (-6.5, -19.968725548))
        make_face()
    extrude(amount=WANDUNG8_5_DEPTH, mode=Mode.SUBTRACT)

    # Wandung8 6 outline → Wandung8 6 (revolve, cut)
    with BuildSketch(Plane.XZ):
        with BuildLine():
            Line((9, -464), (9, -470.0000001))
            Line((9, -470.0000001), (36, -470))
            ThreePointArc((36, -470), (34.242640687, -465.757359313), (30, -464))
            Line((30, -464), (9, -464))
        make_face()
    revolve(axis=Axis((0, 0, 0), (0, 0, 1)), mode=Mode.SUBTRACT)


solid = part.part
